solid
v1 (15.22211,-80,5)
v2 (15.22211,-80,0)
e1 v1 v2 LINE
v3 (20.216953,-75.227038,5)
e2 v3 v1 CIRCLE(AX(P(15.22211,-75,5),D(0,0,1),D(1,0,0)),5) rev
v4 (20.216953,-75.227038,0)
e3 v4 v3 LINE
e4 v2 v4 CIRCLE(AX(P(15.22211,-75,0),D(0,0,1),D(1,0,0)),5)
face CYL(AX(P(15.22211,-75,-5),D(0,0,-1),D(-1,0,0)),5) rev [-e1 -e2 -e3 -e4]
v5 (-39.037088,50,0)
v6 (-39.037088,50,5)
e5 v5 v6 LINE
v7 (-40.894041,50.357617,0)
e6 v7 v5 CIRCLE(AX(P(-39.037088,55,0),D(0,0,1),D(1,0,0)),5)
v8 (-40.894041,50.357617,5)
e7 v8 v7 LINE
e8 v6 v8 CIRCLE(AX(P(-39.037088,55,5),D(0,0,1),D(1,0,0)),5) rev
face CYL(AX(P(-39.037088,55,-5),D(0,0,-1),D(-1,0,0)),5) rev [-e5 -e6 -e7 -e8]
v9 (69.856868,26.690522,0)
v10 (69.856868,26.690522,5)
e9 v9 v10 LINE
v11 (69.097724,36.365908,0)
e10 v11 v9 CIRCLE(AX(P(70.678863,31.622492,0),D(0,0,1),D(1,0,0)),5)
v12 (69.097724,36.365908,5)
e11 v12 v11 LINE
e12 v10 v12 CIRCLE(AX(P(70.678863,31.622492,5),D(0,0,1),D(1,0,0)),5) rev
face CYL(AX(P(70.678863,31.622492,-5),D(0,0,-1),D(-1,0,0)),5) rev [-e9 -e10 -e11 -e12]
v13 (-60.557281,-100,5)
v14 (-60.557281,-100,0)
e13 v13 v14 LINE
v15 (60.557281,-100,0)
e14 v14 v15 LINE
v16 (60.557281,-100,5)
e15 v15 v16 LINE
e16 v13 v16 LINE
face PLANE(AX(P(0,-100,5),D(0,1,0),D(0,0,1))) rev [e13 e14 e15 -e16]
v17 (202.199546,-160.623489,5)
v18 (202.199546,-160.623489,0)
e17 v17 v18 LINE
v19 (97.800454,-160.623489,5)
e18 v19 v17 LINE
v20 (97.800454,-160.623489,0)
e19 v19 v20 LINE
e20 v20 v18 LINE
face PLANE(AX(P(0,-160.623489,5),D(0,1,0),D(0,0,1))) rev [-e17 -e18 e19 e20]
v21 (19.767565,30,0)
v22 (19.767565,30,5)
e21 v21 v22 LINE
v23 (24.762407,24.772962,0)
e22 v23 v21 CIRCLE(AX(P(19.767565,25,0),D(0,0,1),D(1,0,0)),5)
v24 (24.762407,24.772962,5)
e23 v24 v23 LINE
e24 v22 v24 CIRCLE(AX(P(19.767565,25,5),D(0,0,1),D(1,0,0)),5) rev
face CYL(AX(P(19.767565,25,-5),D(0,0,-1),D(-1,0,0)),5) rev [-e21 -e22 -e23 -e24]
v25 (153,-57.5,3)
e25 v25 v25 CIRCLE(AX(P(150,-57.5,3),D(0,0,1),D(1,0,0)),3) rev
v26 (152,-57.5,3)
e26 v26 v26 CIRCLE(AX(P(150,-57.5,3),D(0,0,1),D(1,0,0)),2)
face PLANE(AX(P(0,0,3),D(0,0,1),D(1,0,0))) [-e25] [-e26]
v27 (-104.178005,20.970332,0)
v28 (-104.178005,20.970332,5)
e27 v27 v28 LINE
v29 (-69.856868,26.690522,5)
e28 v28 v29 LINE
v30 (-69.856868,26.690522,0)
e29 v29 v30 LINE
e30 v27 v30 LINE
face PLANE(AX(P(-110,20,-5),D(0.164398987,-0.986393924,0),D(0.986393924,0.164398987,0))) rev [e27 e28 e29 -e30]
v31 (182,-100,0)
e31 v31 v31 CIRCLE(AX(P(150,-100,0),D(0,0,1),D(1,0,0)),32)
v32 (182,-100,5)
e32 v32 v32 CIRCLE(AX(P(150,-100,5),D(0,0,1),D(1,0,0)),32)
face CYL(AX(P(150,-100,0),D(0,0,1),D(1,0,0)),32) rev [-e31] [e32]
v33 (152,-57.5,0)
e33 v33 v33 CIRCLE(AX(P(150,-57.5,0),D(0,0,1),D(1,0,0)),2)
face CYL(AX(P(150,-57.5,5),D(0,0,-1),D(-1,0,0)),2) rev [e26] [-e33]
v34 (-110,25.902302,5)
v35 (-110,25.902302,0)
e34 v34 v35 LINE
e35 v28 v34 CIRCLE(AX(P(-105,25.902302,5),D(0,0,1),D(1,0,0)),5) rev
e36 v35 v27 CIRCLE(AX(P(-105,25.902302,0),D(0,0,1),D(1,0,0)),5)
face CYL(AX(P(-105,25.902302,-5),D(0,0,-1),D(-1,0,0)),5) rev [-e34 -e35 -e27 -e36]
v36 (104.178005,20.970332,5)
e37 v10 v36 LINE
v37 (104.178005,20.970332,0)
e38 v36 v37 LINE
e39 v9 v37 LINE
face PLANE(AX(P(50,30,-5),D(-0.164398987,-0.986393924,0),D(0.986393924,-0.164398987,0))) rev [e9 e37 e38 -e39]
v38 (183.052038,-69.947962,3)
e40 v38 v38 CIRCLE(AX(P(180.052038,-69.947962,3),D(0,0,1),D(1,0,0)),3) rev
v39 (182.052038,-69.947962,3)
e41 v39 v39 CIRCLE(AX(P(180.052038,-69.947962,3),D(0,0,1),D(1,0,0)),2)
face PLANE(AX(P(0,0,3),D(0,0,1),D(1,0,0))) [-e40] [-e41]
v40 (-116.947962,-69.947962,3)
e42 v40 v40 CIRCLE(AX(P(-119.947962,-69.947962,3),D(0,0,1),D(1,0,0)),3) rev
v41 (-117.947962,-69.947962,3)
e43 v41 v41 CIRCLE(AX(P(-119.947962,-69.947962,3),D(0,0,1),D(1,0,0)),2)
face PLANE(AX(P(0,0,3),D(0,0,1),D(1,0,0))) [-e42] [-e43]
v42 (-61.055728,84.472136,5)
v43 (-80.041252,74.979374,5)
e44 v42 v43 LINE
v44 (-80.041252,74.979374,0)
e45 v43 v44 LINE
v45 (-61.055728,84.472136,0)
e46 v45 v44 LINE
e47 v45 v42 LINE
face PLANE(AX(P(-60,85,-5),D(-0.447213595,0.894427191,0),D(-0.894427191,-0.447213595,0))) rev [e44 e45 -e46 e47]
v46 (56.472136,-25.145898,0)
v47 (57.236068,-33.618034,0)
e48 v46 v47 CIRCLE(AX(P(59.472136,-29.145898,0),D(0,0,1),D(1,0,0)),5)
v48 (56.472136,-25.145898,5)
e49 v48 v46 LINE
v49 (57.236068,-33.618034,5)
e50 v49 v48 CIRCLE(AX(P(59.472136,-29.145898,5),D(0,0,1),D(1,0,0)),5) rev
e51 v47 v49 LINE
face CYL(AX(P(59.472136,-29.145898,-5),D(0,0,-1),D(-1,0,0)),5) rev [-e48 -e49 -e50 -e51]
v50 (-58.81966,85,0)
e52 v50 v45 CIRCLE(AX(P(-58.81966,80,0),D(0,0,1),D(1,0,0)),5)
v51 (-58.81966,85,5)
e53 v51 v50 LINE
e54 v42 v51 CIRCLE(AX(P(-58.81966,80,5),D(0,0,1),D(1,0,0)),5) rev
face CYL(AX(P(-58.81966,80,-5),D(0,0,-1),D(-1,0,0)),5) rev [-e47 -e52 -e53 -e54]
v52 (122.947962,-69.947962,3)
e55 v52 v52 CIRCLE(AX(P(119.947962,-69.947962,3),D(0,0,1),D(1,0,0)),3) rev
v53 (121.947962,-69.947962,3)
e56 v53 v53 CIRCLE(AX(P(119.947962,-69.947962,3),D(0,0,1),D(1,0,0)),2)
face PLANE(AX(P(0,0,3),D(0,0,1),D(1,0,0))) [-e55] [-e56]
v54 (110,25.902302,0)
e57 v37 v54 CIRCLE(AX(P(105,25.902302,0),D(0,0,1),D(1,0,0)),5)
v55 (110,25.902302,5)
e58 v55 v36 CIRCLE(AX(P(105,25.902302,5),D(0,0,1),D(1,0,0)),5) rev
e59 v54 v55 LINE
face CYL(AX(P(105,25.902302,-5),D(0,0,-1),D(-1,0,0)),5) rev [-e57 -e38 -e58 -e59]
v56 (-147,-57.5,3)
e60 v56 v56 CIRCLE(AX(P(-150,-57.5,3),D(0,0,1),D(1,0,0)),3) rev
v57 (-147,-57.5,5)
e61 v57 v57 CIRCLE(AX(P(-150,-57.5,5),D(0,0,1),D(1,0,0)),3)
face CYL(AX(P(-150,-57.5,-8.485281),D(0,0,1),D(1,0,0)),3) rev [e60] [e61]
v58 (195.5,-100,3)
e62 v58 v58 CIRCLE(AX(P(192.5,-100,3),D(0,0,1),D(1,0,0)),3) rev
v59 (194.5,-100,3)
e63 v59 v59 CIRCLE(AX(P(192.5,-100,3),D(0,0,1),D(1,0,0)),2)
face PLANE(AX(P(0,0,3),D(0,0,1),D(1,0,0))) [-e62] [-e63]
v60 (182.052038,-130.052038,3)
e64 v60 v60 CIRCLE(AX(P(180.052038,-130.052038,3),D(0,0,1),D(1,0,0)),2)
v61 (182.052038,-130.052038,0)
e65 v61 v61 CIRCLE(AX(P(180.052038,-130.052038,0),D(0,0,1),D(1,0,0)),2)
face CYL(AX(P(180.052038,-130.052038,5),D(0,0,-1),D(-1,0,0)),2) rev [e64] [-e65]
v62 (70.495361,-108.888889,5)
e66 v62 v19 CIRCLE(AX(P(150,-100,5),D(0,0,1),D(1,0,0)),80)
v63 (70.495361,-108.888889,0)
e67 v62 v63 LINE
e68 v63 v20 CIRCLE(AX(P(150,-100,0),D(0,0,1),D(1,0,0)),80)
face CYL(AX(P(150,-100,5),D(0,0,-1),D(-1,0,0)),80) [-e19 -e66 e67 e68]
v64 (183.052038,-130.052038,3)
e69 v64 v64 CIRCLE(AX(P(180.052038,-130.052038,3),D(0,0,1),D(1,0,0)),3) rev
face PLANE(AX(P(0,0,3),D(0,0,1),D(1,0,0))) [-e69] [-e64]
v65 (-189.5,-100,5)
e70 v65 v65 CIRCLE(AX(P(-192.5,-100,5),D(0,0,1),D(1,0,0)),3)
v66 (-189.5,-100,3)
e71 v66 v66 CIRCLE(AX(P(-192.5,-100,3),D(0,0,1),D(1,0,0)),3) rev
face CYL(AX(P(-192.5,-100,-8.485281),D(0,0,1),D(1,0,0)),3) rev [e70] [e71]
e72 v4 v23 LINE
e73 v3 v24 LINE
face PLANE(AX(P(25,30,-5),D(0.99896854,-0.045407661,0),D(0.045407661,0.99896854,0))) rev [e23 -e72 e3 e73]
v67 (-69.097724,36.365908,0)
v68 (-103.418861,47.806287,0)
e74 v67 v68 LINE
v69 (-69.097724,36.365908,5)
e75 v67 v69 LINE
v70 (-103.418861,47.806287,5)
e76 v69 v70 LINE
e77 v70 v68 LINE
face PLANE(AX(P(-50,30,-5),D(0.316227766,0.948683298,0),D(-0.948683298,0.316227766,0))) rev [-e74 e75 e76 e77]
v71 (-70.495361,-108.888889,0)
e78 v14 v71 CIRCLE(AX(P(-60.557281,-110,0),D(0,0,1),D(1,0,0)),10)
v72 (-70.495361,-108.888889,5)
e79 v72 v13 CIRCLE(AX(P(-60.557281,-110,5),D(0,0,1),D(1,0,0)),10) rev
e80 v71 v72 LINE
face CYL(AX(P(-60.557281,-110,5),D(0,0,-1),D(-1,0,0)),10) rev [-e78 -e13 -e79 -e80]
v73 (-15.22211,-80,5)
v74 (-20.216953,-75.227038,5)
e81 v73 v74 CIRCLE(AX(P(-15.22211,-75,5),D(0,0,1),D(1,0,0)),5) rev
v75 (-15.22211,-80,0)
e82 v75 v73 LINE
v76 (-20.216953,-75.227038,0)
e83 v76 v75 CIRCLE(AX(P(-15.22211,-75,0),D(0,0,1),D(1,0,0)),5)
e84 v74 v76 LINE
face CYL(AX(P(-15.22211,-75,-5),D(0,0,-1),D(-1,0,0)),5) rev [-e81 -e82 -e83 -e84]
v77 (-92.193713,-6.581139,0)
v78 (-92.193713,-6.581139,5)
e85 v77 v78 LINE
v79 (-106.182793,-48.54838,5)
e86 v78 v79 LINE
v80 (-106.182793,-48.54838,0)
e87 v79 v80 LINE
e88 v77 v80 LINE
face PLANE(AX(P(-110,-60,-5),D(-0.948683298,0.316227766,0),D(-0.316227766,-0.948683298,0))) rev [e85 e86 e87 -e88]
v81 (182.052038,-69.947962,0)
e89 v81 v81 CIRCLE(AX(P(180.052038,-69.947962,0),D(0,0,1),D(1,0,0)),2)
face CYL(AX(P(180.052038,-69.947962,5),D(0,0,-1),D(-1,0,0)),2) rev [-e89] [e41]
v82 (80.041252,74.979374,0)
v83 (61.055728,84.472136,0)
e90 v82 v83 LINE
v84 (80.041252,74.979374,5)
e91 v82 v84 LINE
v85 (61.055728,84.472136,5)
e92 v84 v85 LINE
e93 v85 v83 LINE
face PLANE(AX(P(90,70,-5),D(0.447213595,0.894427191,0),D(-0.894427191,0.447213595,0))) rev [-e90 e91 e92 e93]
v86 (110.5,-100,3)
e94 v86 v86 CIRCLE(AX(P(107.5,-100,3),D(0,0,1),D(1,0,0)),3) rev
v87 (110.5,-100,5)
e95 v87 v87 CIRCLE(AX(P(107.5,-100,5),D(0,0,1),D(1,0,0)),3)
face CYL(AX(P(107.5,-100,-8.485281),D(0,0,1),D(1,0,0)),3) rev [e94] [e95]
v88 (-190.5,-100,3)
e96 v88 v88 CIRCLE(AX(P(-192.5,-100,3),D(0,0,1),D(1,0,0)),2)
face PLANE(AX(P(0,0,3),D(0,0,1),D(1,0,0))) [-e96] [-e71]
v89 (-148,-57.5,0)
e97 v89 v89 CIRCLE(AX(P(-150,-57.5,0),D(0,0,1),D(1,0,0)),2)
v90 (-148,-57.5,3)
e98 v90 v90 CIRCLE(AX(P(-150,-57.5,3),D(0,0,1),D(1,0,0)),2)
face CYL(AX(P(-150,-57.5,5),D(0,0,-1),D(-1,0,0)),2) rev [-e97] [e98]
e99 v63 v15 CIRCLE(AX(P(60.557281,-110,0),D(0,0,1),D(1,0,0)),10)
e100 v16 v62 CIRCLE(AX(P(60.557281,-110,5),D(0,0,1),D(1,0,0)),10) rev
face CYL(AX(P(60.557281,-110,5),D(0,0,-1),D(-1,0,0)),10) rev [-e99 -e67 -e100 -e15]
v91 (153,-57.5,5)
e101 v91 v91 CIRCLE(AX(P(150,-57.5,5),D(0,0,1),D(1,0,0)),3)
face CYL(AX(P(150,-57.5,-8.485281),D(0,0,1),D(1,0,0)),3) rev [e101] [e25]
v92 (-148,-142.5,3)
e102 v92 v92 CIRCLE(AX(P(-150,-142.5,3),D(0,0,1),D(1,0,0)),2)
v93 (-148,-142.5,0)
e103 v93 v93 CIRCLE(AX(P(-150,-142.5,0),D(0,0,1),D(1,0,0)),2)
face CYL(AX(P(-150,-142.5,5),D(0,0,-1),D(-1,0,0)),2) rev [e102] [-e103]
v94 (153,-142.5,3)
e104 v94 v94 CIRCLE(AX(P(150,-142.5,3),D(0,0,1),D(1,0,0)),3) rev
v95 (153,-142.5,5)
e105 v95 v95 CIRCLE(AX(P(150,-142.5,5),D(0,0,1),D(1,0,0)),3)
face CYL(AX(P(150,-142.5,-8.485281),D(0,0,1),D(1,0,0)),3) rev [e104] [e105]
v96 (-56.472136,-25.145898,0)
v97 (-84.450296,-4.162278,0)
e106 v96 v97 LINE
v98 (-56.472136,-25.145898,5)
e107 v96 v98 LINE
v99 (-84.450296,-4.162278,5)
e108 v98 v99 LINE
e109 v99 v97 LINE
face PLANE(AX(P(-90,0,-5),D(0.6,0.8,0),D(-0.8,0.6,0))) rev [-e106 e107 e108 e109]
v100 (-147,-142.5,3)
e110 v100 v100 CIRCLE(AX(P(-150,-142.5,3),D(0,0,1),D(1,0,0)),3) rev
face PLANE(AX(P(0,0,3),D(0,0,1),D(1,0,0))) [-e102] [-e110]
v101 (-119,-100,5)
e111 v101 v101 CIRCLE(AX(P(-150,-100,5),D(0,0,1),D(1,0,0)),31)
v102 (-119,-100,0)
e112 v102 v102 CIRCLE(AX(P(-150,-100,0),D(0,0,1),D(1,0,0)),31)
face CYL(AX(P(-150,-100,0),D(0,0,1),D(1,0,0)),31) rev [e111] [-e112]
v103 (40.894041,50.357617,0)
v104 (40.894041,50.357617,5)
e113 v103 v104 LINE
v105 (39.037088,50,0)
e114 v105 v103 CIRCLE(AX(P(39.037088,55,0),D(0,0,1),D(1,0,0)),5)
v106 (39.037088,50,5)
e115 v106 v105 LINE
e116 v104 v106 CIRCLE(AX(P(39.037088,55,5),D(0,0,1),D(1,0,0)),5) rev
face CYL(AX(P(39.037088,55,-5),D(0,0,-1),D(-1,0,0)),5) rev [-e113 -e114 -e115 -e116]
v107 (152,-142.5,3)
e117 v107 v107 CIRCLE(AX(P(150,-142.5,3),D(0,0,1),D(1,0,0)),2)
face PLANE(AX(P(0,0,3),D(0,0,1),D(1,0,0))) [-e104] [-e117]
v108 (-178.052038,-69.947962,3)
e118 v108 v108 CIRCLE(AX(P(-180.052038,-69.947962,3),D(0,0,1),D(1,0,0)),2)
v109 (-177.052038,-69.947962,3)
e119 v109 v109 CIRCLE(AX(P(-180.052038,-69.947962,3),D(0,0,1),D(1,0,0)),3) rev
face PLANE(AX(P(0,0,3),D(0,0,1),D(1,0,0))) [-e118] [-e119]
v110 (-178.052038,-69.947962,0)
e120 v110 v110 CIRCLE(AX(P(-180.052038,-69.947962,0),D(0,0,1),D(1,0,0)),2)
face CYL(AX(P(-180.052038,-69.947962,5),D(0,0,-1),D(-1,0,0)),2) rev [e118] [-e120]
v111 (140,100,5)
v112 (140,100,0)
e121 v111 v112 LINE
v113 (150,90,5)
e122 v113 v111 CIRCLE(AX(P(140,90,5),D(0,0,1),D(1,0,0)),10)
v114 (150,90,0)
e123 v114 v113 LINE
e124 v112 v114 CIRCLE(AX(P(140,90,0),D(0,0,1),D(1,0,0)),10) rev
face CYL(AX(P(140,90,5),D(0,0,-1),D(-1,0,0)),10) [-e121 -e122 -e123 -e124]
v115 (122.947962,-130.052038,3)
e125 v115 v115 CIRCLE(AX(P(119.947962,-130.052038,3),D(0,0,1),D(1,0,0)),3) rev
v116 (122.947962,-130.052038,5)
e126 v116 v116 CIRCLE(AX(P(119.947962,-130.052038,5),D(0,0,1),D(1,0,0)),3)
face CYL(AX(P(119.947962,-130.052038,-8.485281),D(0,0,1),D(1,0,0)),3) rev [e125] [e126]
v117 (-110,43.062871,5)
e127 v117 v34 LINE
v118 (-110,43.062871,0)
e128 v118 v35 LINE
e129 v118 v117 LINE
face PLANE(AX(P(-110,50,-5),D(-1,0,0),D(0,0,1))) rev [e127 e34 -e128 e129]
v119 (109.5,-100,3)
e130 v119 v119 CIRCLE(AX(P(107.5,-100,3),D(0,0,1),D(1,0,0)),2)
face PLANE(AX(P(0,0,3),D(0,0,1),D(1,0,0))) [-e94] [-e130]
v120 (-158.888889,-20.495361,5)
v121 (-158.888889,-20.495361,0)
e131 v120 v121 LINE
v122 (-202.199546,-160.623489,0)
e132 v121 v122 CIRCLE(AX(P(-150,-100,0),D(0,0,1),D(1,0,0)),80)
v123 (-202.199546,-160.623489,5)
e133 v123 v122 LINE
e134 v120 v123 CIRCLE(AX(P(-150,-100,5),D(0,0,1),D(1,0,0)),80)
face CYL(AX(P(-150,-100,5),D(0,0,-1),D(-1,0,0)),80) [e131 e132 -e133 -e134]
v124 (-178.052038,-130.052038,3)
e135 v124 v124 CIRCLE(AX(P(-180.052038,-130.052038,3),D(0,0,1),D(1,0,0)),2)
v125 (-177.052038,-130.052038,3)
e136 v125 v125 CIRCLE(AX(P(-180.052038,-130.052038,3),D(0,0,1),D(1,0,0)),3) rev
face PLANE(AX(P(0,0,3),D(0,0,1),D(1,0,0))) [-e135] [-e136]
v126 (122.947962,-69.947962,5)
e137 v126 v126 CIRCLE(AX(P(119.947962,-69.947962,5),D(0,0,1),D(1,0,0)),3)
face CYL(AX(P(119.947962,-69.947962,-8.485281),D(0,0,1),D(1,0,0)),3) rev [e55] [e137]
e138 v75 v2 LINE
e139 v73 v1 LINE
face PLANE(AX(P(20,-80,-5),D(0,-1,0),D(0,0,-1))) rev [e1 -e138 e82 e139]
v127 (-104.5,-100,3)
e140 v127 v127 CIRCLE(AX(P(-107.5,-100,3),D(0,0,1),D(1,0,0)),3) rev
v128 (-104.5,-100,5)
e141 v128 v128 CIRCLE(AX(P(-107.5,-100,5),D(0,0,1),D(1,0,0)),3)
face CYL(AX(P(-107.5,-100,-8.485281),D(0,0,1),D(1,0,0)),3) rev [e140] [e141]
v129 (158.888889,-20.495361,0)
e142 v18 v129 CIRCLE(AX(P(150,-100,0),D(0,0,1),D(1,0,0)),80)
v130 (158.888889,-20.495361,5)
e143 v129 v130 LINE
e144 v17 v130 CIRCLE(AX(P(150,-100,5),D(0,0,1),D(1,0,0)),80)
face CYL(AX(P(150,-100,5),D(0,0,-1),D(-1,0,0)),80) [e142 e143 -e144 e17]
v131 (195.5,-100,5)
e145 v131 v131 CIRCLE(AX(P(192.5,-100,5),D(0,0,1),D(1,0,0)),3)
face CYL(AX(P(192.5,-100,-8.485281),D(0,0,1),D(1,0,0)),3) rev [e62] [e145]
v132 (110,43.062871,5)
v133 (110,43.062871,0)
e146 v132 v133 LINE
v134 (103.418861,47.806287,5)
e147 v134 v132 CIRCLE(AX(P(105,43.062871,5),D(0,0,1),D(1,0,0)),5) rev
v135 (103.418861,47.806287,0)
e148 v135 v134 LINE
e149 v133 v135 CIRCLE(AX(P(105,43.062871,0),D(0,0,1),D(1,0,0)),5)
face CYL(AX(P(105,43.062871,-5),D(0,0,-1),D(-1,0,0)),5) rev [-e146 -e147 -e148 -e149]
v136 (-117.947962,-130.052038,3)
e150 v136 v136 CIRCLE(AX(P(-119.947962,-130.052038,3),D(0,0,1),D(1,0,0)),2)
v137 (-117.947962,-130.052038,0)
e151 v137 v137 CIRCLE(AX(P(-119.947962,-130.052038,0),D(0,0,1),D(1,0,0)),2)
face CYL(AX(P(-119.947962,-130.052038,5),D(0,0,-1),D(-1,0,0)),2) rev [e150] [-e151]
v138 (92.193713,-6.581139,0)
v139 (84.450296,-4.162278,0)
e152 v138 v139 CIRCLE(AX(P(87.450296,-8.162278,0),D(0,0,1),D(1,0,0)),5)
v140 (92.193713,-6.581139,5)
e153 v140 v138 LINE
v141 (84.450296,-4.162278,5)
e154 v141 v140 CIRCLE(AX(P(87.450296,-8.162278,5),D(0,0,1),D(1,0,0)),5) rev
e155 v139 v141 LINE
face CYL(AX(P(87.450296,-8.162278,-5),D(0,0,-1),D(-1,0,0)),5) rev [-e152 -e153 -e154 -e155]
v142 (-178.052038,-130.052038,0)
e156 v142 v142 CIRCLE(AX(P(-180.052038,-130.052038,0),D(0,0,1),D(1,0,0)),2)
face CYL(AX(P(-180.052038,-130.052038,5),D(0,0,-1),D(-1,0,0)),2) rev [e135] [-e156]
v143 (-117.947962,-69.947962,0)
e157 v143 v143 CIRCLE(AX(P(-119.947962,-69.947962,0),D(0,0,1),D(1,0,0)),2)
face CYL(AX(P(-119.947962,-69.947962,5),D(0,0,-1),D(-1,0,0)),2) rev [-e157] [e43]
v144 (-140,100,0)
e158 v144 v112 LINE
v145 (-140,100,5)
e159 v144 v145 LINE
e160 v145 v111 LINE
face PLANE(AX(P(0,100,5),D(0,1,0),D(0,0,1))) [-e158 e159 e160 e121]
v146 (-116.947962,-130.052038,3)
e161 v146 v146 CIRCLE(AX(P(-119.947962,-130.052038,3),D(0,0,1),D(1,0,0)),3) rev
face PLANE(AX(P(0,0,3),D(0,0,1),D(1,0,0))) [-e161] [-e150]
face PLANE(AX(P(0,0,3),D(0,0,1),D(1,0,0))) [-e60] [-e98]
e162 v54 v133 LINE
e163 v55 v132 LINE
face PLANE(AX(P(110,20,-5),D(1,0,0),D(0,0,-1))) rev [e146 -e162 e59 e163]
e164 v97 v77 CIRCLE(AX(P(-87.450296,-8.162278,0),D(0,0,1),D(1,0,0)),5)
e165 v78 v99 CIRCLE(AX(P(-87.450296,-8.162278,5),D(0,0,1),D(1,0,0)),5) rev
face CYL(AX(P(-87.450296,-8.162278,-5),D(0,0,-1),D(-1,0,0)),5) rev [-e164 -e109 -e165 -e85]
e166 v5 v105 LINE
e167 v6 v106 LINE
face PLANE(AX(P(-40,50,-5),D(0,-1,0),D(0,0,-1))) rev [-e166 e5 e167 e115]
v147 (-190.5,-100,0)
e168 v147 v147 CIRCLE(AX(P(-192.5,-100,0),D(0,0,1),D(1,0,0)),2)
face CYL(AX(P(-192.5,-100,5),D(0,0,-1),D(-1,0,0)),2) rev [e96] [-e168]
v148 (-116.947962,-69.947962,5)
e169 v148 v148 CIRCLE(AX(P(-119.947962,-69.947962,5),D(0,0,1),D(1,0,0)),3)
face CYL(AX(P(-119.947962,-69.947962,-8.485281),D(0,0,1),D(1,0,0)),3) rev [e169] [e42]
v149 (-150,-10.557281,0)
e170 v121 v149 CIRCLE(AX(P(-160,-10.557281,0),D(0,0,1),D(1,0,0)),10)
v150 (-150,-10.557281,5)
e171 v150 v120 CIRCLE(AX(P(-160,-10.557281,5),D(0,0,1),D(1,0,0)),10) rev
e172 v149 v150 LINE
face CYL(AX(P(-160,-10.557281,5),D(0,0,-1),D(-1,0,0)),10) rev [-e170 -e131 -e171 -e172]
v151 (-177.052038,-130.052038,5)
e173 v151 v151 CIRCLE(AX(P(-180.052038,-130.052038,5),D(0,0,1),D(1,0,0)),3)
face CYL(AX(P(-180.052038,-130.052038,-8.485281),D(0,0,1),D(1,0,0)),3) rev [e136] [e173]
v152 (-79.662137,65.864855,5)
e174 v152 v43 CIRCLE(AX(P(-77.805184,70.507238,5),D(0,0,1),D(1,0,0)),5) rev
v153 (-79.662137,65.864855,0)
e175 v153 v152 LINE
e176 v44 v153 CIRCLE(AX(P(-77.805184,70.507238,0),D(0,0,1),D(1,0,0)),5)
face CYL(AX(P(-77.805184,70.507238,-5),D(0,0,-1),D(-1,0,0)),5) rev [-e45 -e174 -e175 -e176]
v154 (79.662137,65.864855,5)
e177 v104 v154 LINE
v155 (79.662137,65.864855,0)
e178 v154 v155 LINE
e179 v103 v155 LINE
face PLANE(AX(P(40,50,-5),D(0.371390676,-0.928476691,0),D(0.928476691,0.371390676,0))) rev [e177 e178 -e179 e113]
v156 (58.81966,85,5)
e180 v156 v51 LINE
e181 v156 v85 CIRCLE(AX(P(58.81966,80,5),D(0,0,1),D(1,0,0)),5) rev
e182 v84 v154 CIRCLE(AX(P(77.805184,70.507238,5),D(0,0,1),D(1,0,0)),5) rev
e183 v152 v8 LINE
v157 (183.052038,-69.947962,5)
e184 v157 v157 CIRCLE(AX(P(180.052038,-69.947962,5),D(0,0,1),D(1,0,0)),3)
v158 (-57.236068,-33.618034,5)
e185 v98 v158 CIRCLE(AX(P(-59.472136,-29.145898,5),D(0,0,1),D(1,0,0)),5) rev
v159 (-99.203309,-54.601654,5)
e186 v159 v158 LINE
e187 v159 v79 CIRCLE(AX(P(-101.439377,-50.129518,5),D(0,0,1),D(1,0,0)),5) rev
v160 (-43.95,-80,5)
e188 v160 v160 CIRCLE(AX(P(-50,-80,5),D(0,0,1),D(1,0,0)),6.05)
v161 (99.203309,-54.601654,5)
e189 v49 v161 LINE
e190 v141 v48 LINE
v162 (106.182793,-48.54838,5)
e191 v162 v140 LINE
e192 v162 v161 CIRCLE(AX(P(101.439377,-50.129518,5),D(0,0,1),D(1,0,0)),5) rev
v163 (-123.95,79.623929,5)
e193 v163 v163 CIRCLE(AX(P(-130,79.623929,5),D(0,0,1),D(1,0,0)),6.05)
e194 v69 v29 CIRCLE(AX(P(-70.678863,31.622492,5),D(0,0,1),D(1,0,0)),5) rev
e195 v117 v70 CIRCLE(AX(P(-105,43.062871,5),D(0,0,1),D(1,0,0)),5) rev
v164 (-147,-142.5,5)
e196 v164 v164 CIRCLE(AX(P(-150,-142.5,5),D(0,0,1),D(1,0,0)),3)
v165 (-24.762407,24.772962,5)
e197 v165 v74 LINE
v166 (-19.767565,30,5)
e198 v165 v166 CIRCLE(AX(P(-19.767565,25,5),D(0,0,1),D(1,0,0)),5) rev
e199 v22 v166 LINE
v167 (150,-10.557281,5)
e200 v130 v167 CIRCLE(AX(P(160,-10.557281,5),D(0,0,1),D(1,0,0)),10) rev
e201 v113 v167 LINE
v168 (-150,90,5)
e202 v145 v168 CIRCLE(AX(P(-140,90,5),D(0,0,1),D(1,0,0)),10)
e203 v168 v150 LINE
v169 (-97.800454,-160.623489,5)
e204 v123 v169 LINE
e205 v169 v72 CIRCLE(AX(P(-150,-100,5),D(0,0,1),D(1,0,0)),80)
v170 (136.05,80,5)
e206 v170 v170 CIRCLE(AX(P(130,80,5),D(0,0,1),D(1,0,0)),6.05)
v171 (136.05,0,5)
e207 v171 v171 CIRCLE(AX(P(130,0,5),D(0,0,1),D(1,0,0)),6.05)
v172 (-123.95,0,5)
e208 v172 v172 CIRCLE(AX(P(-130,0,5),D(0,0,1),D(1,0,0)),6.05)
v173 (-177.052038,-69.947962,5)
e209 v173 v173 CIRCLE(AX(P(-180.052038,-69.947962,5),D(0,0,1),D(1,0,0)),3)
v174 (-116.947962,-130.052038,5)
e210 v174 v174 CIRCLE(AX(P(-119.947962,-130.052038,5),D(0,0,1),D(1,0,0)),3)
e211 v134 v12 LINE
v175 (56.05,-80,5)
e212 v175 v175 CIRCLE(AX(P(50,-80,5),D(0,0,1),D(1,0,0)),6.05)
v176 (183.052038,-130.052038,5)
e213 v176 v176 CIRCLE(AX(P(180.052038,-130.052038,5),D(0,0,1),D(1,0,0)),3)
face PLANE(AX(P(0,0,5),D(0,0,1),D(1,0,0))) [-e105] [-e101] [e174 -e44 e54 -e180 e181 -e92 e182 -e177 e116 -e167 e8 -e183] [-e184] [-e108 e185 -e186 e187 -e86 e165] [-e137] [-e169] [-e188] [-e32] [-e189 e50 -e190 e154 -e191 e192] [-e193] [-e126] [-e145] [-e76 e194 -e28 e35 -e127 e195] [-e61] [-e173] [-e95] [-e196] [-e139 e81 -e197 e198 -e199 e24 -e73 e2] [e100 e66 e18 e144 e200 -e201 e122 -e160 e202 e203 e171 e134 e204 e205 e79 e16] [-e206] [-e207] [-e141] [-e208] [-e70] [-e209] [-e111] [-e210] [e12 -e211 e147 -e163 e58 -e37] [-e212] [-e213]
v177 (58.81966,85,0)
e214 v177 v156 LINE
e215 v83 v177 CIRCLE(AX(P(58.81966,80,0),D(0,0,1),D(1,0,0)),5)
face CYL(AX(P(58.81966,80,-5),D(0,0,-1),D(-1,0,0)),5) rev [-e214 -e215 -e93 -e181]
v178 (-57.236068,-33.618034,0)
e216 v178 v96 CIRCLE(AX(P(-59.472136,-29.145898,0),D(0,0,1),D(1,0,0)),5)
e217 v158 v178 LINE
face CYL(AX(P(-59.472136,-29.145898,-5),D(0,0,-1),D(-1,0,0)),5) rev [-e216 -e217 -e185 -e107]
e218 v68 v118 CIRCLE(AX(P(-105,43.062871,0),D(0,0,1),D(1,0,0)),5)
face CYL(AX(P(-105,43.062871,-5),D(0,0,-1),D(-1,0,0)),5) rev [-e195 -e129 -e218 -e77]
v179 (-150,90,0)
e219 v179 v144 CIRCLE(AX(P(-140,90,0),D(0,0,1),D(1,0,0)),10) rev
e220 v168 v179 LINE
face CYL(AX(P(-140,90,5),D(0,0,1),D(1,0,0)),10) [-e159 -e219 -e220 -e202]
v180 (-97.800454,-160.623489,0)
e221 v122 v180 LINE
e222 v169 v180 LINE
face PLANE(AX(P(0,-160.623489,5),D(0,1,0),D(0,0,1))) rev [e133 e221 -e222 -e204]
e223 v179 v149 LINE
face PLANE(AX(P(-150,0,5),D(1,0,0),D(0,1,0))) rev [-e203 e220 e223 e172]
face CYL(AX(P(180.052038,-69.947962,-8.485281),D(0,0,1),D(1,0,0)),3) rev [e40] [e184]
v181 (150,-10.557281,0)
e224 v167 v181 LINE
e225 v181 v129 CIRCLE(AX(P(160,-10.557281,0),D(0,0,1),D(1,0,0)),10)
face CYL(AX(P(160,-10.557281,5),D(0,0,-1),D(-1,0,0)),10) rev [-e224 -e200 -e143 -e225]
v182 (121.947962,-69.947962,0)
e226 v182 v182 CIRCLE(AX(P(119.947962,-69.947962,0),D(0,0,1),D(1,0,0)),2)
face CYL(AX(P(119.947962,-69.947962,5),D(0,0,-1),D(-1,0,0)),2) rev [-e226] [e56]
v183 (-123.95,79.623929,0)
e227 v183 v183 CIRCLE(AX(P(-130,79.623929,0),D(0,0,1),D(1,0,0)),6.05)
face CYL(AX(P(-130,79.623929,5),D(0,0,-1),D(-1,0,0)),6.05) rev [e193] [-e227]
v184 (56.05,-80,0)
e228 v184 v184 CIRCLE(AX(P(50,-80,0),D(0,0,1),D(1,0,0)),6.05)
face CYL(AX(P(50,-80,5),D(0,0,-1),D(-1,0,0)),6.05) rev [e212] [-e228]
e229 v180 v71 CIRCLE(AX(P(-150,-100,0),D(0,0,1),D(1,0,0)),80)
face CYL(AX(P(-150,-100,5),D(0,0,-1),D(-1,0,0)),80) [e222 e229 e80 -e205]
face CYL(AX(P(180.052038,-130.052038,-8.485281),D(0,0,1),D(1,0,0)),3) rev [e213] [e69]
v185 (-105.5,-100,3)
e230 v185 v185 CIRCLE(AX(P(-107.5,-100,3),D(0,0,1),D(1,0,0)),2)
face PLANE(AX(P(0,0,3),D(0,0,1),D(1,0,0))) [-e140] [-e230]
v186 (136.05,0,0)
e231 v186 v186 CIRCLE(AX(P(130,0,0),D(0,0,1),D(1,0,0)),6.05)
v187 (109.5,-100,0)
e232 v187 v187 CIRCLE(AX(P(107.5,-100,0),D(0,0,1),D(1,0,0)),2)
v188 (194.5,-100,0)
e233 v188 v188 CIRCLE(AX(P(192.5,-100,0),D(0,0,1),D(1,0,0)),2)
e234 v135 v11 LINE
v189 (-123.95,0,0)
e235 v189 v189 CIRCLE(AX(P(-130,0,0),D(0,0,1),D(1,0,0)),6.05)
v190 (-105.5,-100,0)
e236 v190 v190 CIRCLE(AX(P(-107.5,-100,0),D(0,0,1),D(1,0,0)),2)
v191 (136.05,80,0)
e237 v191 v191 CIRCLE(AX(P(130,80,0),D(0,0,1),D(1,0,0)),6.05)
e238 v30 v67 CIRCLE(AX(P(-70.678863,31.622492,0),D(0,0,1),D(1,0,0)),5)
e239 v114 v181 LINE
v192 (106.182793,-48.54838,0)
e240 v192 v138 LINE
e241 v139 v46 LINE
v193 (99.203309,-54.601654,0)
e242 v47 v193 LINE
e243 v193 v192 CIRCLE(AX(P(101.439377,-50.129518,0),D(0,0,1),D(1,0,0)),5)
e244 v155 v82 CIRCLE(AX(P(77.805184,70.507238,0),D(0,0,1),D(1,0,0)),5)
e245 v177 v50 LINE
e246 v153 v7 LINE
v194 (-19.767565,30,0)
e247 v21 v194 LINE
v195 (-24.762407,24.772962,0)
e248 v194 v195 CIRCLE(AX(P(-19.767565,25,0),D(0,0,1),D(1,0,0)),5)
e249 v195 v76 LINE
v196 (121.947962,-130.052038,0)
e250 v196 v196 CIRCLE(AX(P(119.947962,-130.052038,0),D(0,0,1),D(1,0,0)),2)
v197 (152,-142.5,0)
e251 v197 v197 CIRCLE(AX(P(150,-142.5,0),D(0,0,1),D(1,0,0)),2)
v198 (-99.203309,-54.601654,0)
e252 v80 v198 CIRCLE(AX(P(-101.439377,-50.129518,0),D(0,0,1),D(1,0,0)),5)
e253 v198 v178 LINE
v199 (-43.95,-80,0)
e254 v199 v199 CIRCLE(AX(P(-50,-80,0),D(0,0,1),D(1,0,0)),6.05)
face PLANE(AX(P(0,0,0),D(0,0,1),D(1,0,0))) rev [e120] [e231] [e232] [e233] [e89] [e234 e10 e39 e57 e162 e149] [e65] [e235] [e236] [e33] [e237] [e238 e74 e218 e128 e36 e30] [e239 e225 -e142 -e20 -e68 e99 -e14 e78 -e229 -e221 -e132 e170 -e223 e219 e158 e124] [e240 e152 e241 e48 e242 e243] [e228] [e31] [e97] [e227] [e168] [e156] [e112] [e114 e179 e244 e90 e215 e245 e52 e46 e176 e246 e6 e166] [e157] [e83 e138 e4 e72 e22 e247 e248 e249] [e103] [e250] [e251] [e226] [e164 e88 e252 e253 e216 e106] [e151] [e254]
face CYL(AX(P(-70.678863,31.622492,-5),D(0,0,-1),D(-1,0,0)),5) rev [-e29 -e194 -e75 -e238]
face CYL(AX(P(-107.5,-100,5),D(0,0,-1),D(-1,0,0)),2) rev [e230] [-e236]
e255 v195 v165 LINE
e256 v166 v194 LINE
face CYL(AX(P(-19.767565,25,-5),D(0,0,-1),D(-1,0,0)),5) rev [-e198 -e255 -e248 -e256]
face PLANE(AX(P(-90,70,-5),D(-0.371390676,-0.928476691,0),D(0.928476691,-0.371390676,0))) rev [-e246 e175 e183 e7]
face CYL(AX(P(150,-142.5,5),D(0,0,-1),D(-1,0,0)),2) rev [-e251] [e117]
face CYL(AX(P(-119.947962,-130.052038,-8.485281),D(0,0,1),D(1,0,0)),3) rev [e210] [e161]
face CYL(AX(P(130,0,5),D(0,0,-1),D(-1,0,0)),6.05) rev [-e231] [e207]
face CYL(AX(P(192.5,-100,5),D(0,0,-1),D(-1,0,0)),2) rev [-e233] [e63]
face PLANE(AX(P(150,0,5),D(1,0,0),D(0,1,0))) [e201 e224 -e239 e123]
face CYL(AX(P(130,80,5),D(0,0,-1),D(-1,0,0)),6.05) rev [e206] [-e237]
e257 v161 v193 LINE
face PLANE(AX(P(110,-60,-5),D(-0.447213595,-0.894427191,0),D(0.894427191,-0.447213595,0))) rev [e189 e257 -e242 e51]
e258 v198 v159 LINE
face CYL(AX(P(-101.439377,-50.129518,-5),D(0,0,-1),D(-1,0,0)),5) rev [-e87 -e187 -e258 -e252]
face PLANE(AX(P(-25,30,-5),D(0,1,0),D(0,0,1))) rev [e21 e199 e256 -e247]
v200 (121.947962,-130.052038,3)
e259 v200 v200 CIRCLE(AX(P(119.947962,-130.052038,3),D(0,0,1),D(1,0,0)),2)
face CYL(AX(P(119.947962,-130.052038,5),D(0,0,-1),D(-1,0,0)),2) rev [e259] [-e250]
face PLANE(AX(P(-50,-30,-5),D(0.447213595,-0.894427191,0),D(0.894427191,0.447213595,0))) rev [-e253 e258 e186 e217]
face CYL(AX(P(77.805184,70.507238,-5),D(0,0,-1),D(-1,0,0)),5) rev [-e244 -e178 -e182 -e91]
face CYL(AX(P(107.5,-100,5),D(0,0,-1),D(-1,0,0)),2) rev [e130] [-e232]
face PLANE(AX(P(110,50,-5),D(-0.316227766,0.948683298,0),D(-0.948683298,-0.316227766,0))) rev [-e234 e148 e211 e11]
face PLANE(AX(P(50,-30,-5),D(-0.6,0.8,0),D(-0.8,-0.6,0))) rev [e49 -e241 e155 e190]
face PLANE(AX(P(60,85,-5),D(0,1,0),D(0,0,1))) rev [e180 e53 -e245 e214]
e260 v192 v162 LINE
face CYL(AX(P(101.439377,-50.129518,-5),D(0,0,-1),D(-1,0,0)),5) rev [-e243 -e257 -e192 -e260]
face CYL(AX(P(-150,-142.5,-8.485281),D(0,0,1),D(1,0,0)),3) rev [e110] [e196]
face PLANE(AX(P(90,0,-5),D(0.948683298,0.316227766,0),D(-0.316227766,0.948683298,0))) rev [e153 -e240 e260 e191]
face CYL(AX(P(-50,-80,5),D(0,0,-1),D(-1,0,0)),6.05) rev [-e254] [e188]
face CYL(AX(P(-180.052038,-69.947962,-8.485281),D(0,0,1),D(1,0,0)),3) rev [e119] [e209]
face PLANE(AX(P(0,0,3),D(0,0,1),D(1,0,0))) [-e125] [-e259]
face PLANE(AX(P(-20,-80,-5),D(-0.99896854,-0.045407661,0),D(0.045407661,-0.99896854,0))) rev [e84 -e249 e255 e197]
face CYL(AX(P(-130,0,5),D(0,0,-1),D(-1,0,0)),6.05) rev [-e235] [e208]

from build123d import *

# Parameters (mm, degrees)
EXTRUDE_1_OUTLINE_R   = 2
EXTRUDE_1_OUTLINE_R_2 = 6.05
EXTRUDE_1_DEPTH       = 5
CUT_EXTRUDE_START     = -2
SKETCH_2_R            = 3
SKETCH_2_R_2          = 2
CUT_EXTRUDE_1_DEPTH   = 2
SKETCH_3_R            = 31
SKETCH_3_R_2          = 32
CUT_EXTRUDE_2_DEPTH   = 281.579587951
FILLET_1_R            = 10
SKETCH1_R             = 11.937888281
CUT_EXTRUDE1_DEPTH    = 10
FILLET1_R             = 5


# Read off the part's stored shape, not the designer's step: 凸台-拉伸1
with BuildPart() as part:
    # 凸台-拉伸1 outline → 凸台-拉伸1 (new body)
    with BuildSketch(Plane.XY):
        with BuildLine():
            ThreePointArc((-97.800454043, -160.623488863), (-77.281489026, -133.346936317), (-70, -100))
            Line((-70, -100), (70, -100))
            ThreePointArc((70, -100), (77.281489026, -133.346936317), (97.800454043, -160.623488863))
            Line((97.800454043, -160.623488863), (202.199545957, -160.623488863))
            ThreePointArc((202.199545957, -160.623488863), (224.999597029, -72.160092574), (150, -20))
            Line((150, -20), (150, 100))
            Line((150, 100), (-150, 100))
            Line((-150, 100), (-150, -20))
            ThreePointArc((-150, -20), (-224.999597029, -72.160092574), (-202.199545957, -160.623488863))
            Line((-202.199545957, -160.623488863), (-97.800454043, -160.623488863))
        make_face()
        with Locations((-180.0520382, -130.0520382)):
            Circle(EXTRUDE_1_OUTLINE_R, mode=Mode.SUBTRACT)
        with Locations((-150, -142.5)):
            Circle(EXTRUDE_1_OUTLINE_R, mode=Mode.SUBTRACT)
        with Locations((-119.9479618, -130.0520382)):
            Circle(EXTRUDE_1_OUTLINE_R, mode=Mode.SUBTRACT)
        with Locations((-192.5, -100)):
            Circle(EXTRUDE_1_OUTLINE_R, mode=Mode.SUBTRACT)
        with Locations((-107.5, -100)):
            Circle(EXTRUDE_1_OUTLINE_R, mode=Mode.SUBTRACT)
        with Locations((-180.0520382, -69.9479618)):
            Circle(EXTRUDE_1_OUTLINE_R, mode=Mode.SUBTRACT)
        with Locations((-119.9479618, -69.9479618)):
            Circle(EXTRUDE_1_OUTLINE_R, mode=Mode.SUBTRACT)
        with Locations((-150, -57.5)):
            Circle(EXTRUDE_1_OUTLINE_R, mode=Mode.SUBTRACT)
        with Locations((-50, -80)):
            Circle(EXTRUDE_1_OUTLINE_R_2, mode=Mode.SUBTRACT)
        with Locations((107.5, -100)):
            Circle(EXTRUDE_1_OUTLINE_R, mode=Mode.SUBTRACT)
        with Locations((119.9479618, -130.0520382)):
            Circle(EXTRUDE_1_OUTLINE_R, mode=Mode.SUBTRACT)
        with Locations((150, -142.5)):
            Circle(EXTRUDE_1_OUTLINE_R, mode=Mode.SUBTRACT)
        with Locations((180.0520382, -130.0520382)):
            Circle(EXTRUDE_1_OUTLINE_R, mode=Mode.SUBTRACT)
        with Locations((192.5, -100)):
            Circle(EXTRUDE_1_OUTLINE_R, mode=Mode.SUBTRACT)
        with Locations((50, -80)):
            Circle(EXTRUDE_1_OUTLINE_R_2, mode=Mode.SUBTRACT)
        with Locations((119.9479618, -69.9479618)):
            Circle(EXTRUDE_1_OUTLINE_R, mode=Mode.SUBTRACT)
        with Locations((180.0520382, -69.9479618)):
            Circle(EXTRUDE_1_OUTLINE_R, mode=Mode.SUBTRACT)
        with Locations((150, -57.5)):
            Circle(EXTRUDE_1_OUTLINE_R, mode=Mode.SUBTRACT)
        with Locations((-130, 0)):
            Circle(EXTRUDE_1_OUTLINE_R_2, mode=Mode.SUBTRACT)
        with Locations((-130, 79.62392947)):
            Circle(EXTRUDE_1_OUTLINE_R_2, mode=Mode.SUBTRACT)
        with Locations((130, 0)):
            Circle(EXTRUDE_1_OUTLINE_R_2, mode=Mode.SUBTRACT)
        with Locations((130, 80)):
            Circle(EXTRUDE_1_OUTLINE_R_2, mode=Mode.SUBTRACT)
    extrude(amount=EXTRUDE_1_DEPTH)

    # 草图2 → 切除-拉伸1 (cut)
    # profile 1 of 16: a face of its own
    with BuildSketch(Plane.XY.offset(5).offset(CUT_EXTRUDE_START)):
        with Locations((-192.5, -100)):
            Circle(SKETCH_2_R)
        with Locations((-192.5, -100)):
            Circle(SKETCH_2_R_2, mode=Mode.SUBTRACT)
    # profile 2 of 16: a face of its own
    with BuildSketch(Plane.XY.offset(5).offset(CUT_EXTRUDE_START)):
        with Locations((-180.0520382, -130.0520382)):
            Circle(SKETCH_2_R)
        with Locations((-180.0520382, -130.0520382)):
            Circle(SKETCH_2_R_2, mode=Mode.SUBTRACT)
    # profile 3 of 16: a face of its own
    with BuildSketch(Plane.XY.offset(5).offset(CUT_EXTRUDE_START)):
        with Locations((-150, -142.5)):
            Circle(SKETCH_2_R)
        with Locations((-150, -142.5)):
            Circle(SKETCH_2_R_2, mode=Mode.SUBTRACT)
    # profile 4 of 16: a face of its own
    with BuildSketch(Plane.XY.offset(5).offset(CUT_EXTRUDE_START)):
        with Locations((-119.9479618, -130.0520382)):
            Circle(SKETCH_2_R)
        with Locations((-119.9479618, -130.0520382)):
            Circle(SKETCH_2_R_2, mode=Mode.SUBTRACT)
    # profile 5 of 16: a face of its own
    with BuildSketch(Plane.XY.offset(5).offset(CUT_EXTRUDE_START)):
        with Locations((-107.5, -100)):
            Circle(SKETCH_2_R)
        with Locations((-107.5, -100)):
            Circle(SKETCH_2_R_2, mode=Mode.SUBTRACT)
    # profile 6 of 16: a face of its own
    with BuildSketch(Plane.XY.offset(5).offset(CUT_EXTRUDE_START)):
        with Locations((150, -57.5)):
            Circle(SKETCH_2_R)
        with Locations((150, -57.5)):
            Circle(SKETCH_2_R_2, mode=Mode.SUBTRACT)
    # profile 7 of 16: a face of its own
    with BuildSketch(Plane.XY.offset(5).offset(CUT_EXTRUDE_START)):
        with Locations((180.0520382, -69.9479618)):
            Circle(SKETCH_2_R)
        with Locations((180.0520382, -69.9479618)):
            Circle(SKETCH_2_R_2, mode=Mode.SUBTRACT)
    # profile 8 of 16: a face of its own
    with BuildSketch(Plane.XY.offset(5).offset(CUT_EXTRUDE_START)):
        with Locations((119.9479618, -69.9479618)):
            Circle(SKETCH_2_R)
        with Locations((119.9479618, -69.9479618)):
            Circle(SKETCH_2_R_2, mode=Mode.SUBTRACT)
    # profile 9 of 16: a face of its own
    with BuildSketch(Plane.XY.offset(5).offset(CUT_EXTRUDE_START)):
        with Locations((107.5, -100)):
            Circle(SKETCH_2_R)
        with Locations((107.5, -100)):
            Circle(SKETCH_2_R_2, mode=Mode.SUBTRACT)
    # profile 10 of 16: a face of its own
    with BuildSketch(Plane.XY.offset(5).offset(CUT_EXTRUDE_START)):
        with Locations((150, -142.5)):
            Circle(SKETCH_2_R)
        with Locations((150, -142.5)):
            Circle(SKETCH_2_R_2, mode=Mode.SUBTRACT)
    # profile 11 of 16: a face of its own
    with BuildSketch(Plane.XY.offset(5).offset(CUT_EXTRUDE_START)):
        with Locations((180.0520382, -130.0520382)):
            Circle(SKETCH_2_R)
        with Locations((180.0520382, -130.0520382)):
            Circle(SKETCH_2_R_2, mode=Mode.SUBTRACT)
    # profile 12 of 16: a face of its own
    with BuildSketch(Plane.XY.offset(5).offset(CUT_EXTRUDE_START)):
        with Locations((-150, -57.5)):
            Circle(SKETCH_2_R)
    # profile 13 of 16: a face of its own
    with BuildSketch(Plane.XY.offset(5).offset(CUT_EXTRUDE_START)):
        with Locations((-119.9479618, -69.9479618)):
            Circle(SKETCH_2_R)
    # profile 14 of 16: a face of its own
    with BuildSketch(Plane.XY.offset(5).offset(CUT_EXTRUDE_START)):
        with Locations((-180.0520382, -69.9479618)):
            Circle(SKETCH_2_R)
    # profile 15 of 16: a face of its own
    with BuildSketch(Plane.XY.offset(5).offset(CUT_EXTRUDE_START)):
        with Locations((119.9479618, -130.0520382)):
            Circle(SKETCH_2_R)
    # profile 16 of 16: a face of its own
    with BuildSketch(Plane.XY.offset(5).offset(CUT_EXTRUDE_START)):
        with Locations((192.5, -100)):
            Circle(SKETCH_2_R)
    extrude(amount=CUT_EXTRUDE_1_DEPTH, mode=Mode.SUBTRACT)

    # 草图3 → 切除-拉伸2 (cut, through all)
    with BuildSketch(Plane.XY.offset(5)):
        with Locations((-150, -100)):
            Circle(SKETCH_3_R)
        with Locations((150, -100)):
            Circle(SKETCH_3_R_2)
    extrude(amount=-CUT_EXTRUDE_2_DEPTH, mode=Mode.SUBTRACT)

    # 圆角1
    fillet_1_edges = [part.edges().sort_by_distance(p)[0] for p in [
        (-150, -20, 2.5),
        (-150, 100, 2.5),
        (150, 100, 2.5),
        (150, -20, 2.5),
        (70, -100, 2.5),
        (-70, -100, 2.5),
    ]]
    fillet(fillet_1_edges, radius=FILLET_1_R)

    # Sketch1 → Cut-Extrude1 (cut)
    # profile 1 of 6: a face of its own
    with BuildSketch(Plane.XY.offset(5)):
        Polygon((-90, 70), (-40, 50), (40, 50), (90, 70), (60, 85), (-60, 85), align=None)
    # profile 2 of 6: a face of its own
    with BuildSketch(Plane.XY.offset(5)):
        Polygon((-110, 50), (-110, 20), (-50, 30), align=None)
    # profile 3 of 6: a face of its own
    with BuildSketch(Plane.XY.offset(5)):
        Polygon((50, 30), (110, 20), (110, 50), align=None)
    # profile 4 of 6: a face of its own
    with BuildSketch(Plane.XY.offset(5)):
        Polygon((-25, 30), (25, 30), (20, -80), (-20, -80), align=None)
        Circle(SKETCH1_R, mode=Mode.SUBTRACT)
    # profile 5 of 6: a face of its own
    with BuildSketch(Plane.XY.offset(5)):
        Polygon((-90, 0), (-50, -30), (-110, -60), align=None)
    # profile 6 of 6: a face of its own
    with BuildSketch(Plane.XY.offset(5)):
        Polygon((50, -30), (90, 0), (110, -60), align=None)
    extrude(amount=-CUT_EXTRUDE1_DEPTH, mode=Mode.SUBTRACT)


with BuildPart() as body_2:
    # of the pieces the cut leaves, the one that is kept (cut_extrude1_keep)
    add(part.part.solids().sort_by_distance((-158.888888889, -20.4953608, 0))[0])

    # Fillet1
    fillet1_edges = [body_2.edges().sort_by_distance(p)[0] for p in [
        (-60, 85, 2.5),
        (60, 85, 2.5),
        (90, 70, 2.5),
        (40, 50, 2.5),
        (-40, 50, 2.5),
        (-90, 70, 2.5),
        (50, -30, 2.5),
        (90, 0, 2.5),
        (110, -60, 2.5),
        (-25, 30, 2.5),
        (25, 30, 2.5),
        (20, -80, 2.5),
        (-20, -80, 2.5),
        (-50, 30, 2.5),
        (-110, 20, 2.5),
        (-110, 50, 2.5),
        (110, 50, 2.5),
        (110, 20, 2.5),
        (50, 30, 2.5),
        (-90, 0, 2.5),
        (-50, -30, 2.5),
        (-110, -60, 2.5),
    ]]
    fillet(fillet1_edges, radius=FILLET1_R)


solid = body_2.part
